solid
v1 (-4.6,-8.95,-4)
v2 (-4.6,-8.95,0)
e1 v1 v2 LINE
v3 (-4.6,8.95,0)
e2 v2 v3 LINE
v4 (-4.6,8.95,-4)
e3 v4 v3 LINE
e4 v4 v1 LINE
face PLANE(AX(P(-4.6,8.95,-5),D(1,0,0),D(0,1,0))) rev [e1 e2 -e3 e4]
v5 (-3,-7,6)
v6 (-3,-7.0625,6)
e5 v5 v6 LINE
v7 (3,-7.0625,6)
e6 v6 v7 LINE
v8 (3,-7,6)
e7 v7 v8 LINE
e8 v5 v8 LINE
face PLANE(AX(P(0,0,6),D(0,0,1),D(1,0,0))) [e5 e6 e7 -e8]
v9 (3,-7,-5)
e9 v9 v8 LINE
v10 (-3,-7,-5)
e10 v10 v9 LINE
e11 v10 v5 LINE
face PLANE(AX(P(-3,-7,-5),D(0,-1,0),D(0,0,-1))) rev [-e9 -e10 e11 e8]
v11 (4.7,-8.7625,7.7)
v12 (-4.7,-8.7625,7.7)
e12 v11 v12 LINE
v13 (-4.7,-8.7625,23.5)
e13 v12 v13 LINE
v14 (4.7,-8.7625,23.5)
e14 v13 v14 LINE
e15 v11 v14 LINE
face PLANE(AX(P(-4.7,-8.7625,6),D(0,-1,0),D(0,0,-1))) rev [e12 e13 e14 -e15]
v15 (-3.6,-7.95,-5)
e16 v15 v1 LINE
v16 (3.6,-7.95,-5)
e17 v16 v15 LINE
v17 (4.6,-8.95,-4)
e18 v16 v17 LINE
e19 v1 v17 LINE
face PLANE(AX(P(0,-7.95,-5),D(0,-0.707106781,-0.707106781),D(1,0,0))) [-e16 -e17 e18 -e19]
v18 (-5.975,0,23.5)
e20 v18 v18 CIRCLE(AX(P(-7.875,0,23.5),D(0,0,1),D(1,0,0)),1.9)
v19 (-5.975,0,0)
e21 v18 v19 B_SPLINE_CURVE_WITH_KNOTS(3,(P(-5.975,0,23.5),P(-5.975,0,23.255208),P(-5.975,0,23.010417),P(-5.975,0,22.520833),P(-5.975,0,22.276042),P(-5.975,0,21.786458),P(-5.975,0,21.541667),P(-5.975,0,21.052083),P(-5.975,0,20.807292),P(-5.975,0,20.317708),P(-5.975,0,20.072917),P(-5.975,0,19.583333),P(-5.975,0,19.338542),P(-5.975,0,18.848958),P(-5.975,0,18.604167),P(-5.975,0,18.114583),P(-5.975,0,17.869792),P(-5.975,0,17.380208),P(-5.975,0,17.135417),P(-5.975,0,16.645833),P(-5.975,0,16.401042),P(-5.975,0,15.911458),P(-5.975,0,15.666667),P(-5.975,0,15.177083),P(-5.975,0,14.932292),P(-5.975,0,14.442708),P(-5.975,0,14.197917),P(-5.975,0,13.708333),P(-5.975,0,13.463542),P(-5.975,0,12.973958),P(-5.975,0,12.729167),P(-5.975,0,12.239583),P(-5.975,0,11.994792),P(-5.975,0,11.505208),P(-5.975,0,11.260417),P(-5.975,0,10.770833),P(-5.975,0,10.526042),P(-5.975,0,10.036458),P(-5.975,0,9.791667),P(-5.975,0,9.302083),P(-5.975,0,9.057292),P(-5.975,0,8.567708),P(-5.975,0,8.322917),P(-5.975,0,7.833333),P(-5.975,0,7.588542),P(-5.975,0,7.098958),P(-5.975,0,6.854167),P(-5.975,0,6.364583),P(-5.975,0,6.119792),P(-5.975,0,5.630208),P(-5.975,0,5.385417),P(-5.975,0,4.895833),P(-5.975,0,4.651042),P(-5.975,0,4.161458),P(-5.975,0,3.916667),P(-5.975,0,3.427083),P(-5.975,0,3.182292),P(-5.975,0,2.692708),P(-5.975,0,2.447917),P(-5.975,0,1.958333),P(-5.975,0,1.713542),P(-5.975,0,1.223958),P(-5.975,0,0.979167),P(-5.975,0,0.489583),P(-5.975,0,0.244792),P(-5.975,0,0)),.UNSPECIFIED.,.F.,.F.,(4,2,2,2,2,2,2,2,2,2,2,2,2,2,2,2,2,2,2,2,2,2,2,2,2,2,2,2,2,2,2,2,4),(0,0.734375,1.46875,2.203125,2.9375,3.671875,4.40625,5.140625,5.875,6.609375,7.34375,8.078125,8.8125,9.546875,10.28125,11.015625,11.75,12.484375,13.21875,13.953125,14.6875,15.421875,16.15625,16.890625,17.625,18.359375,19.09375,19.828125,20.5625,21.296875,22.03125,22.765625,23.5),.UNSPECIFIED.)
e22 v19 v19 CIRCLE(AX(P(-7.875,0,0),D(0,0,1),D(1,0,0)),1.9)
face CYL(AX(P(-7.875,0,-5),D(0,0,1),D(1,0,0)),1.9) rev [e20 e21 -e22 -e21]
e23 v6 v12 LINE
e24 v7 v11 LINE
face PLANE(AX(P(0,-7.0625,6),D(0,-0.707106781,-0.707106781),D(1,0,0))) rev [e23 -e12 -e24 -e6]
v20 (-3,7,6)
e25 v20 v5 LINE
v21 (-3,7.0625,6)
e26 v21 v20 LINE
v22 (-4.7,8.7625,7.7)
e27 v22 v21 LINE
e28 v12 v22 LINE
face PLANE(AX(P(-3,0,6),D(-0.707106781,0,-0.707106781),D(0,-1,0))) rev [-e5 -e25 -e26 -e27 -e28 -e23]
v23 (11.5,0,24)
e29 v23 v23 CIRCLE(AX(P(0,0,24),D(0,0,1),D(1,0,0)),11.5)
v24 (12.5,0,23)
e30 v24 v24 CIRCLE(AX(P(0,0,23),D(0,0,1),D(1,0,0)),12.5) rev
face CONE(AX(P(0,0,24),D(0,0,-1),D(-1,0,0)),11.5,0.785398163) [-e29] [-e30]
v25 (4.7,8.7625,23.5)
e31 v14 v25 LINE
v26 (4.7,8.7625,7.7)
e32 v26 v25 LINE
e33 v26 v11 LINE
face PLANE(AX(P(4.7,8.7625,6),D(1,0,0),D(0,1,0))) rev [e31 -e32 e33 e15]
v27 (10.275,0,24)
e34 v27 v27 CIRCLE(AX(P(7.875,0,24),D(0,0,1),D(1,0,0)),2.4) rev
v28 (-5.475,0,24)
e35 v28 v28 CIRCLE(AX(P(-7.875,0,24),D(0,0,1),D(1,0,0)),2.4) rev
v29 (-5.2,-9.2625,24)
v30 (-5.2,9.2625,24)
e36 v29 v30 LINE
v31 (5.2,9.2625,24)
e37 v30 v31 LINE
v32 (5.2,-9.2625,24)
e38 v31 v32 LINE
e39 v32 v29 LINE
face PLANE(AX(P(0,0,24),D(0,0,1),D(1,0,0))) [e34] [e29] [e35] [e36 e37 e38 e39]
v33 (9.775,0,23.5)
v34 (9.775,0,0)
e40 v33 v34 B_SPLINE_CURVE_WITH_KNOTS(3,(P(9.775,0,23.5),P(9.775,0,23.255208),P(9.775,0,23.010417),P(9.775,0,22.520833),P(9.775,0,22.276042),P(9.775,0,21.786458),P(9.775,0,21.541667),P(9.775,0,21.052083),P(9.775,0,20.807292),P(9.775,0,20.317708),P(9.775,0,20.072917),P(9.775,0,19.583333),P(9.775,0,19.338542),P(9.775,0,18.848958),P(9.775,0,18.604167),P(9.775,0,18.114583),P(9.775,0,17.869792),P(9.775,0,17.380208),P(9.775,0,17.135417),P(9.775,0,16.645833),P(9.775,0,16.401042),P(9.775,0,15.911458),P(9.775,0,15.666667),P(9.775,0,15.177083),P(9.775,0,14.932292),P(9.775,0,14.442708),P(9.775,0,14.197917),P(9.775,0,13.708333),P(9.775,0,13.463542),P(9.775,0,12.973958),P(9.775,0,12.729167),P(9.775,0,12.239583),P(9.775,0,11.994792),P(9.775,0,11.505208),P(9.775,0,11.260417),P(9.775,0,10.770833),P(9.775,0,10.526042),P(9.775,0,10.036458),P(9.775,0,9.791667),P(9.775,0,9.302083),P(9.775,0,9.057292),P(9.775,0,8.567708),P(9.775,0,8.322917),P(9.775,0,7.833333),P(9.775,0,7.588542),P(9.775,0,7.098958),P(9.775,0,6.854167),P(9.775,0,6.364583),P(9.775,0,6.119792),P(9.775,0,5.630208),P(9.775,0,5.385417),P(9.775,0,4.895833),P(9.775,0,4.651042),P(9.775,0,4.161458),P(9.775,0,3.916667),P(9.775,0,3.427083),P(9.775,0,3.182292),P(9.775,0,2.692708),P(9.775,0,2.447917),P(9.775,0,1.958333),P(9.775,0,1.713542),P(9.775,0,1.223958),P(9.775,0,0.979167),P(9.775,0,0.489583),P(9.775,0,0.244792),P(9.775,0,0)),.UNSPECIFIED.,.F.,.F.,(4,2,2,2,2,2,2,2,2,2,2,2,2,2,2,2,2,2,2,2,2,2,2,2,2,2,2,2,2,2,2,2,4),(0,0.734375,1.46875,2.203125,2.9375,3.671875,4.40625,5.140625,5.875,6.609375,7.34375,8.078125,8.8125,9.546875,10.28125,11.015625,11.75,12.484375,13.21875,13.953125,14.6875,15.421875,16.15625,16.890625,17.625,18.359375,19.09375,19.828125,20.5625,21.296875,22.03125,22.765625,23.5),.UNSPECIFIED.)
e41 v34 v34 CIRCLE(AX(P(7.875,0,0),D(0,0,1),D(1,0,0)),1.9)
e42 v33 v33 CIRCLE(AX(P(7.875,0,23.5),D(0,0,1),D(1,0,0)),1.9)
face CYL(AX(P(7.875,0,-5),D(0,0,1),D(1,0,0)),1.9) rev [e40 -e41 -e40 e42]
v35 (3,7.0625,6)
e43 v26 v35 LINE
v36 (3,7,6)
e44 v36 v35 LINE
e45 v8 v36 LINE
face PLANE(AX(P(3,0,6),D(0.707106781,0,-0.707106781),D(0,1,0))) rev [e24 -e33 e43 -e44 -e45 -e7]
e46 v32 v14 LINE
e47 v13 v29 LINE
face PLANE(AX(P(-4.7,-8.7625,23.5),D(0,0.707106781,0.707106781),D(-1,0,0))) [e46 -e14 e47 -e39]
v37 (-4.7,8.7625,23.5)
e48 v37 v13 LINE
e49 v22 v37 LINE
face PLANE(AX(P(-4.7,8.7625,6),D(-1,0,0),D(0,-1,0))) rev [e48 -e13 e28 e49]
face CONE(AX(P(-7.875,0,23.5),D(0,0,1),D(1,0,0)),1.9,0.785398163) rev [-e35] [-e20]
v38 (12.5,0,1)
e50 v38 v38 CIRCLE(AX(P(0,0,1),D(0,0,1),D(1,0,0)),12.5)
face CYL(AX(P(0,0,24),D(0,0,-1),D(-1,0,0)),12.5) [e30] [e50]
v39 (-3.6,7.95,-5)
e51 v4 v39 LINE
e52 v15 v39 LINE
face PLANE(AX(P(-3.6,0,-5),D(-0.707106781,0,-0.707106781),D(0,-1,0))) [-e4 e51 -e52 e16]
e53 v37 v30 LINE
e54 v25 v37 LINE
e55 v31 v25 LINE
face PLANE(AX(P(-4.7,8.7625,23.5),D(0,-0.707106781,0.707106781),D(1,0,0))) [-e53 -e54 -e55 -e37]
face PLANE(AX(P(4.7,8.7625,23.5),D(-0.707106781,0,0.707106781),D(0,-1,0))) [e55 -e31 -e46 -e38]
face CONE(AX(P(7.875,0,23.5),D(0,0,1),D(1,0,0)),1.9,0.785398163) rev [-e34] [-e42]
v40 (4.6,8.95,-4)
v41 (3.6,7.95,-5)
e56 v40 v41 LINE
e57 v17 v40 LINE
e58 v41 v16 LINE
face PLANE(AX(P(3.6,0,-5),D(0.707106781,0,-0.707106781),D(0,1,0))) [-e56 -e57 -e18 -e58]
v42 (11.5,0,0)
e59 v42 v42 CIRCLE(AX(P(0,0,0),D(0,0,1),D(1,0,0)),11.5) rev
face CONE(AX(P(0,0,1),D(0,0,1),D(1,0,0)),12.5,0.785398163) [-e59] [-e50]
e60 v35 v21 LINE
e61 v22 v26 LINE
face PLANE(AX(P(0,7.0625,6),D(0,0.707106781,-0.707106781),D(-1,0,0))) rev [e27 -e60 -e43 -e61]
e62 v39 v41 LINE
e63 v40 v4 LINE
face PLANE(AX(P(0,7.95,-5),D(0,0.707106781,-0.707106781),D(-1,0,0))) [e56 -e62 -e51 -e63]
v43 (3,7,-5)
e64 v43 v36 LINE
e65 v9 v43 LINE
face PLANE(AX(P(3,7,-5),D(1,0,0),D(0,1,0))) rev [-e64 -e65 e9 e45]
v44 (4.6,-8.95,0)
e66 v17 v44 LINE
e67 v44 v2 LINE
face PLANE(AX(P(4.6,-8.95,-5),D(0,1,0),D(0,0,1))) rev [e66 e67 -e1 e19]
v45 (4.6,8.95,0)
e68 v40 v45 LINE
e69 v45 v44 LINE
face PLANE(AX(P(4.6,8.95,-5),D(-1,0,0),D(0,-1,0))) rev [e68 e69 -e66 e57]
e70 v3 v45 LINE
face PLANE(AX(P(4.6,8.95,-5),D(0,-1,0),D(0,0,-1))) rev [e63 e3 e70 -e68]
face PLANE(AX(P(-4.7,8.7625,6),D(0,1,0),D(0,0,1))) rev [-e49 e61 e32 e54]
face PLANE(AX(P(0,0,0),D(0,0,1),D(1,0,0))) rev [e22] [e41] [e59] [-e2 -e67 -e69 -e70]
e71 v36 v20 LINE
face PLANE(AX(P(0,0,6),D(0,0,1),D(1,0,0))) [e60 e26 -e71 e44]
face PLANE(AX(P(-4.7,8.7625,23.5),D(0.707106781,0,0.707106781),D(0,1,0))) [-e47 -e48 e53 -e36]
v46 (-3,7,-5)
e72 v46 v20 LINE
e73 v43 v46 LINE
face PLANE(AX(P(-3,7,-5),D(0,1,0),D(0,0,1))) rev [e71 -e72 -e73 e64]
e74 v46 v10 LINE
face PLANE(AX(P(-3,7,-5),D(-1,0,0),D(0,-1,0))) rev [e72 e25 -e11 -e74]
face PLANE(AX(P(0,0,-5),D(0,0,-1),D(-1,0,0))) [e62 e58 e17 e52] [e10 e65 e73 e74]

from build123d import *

# Parameters (mm, degrees)
CROQUIS1_R              = 12.5
SALIENTE_EXTRUIR1_DEPTH = 24
CROQUIS2_W              = 9.4
CROQUIS2_H              = 17.525
CORTAR_EXTRUIR1_DEPTH   = 18
CROQUIS3_W              = 9.2
CROQUIS3_H              = 17.9
SALIENTE_EXTRUIR2_DEPTH = 5
CHAFL_N1_SIZE           = 1
CHAFL_N2_SIZE           = 1
CROQUIS4_R              = 1.9
CORTAR_EXTRUIR2_DEPTH   = 34.963215395
CHAFL_N3_SIZE           = 1
CROQUIS5_W              = 6
CROQUIS5_H              = 14
CORTAR_EXTRUIR3_DEPTH   = 26.228951623
CHAFL_N4_SIZE           = 1.7
CHAFL_N5_SIZE           = 0.5
CHAFL_N6_SIZE           = 0.5


with BuildPart() as part:
    # Croquis1 → Saliente-Extruir1 (new body)
    with BuildSketch(Plane.XY):
        Circle(CROQUIS1_R)
    extrude(amount=SALIENTE_EXTRUIR1_DEPTH)

    # Croquis2 → Cortar-Extruir1 (cut)
    with BuildSketch(Plane.XY.offset(24)):
        Rectangle(CROQUIS2_W, CROQUIS2_H)
    extrude(amount=-CORTAR_EXTRUIR1_DEPTH, mode=Mode.SUBTRACT)

    # Croquis3 → Saliente-Extruir2 (add)
    with BuildSketch(Plane(origin=(0, 0, 0), x_dir=(-1, 0, 0), z_dir=(0, 0, -1))):
        Rectangle(CROQUIS3_W, CROQUIS3_H)
    extrude(amount=SALIENTE_EXTRUIR2_DEPTH)

    # Chaflán1
    chafl_n1_edges = [part.edges().sort_by_distance(p)[0] for p in [
        (-4.6, 0, -5),
        (0, 8.95, -5),
        (4.6, 0, -5),
        (0, -8.95, -5),
    ]]
    chamfer(chafl_n1_edges, length=CHAFL_N1_SIZE)

    # Chaflán2
    chafl_n2_edges = [part.edges().sort_by_distance(p)[0] for p in [
        (-12.5, 0, 0),
    ]]
    chamfer(chafl_n2_edges, length=CHAFL_N2_SIZE)

    # Croquis4 → Cortar-Extruir2 (cut, through all)
    with BuildSketch(Plane.XY.offset(24)):
        with Locations((-7.875, 0)):
            Circle(CROQUIS4_R)
        with Locations((7.875, 0)):
            Circle(CROQUIS4_R)
    extrude(amount=-CORTAR_EXTRUIR2_DEPTH, mode=Mode.SUBTRACT)

    # Chaflán3
    chafl_n3_edges = [part.edges().sort_by_distance(p)[0] for p in [
        (-12.5, 0, 24),
    ]]
    chamfer(chafl_n3_edges, length=CHAFL_N3_SIZE)

    # Croquis5 → Cortar-Extruir3 (cut, through all)
    with BuildSketch(Plane.XY.offset(6)):
        Rectangle(CROQUIS5_W, CROQUIS5_H)
    extrude(amount=-CORTAR_EXTRUIR3_DEPTH, mode=Mode.SUBTRACT)

    # Chaflán4
    chafl_n4_edges = [part.edges().sort_by_distance(p)[0] for p in [
        (4.7, 0, 6),
        (0, -8.7625, 6),
        (-4.7, 0, 6),
        (0, 8.7625, 6),
    ]]
    chamfer(chafl_n4_edges, length=CHAFL_N4_SIZE - 0.0001)  # a hair under: the kernel refuses the full size

    # Chaflán5
    chafl_n5_edges = [part.edges().sort_by_distance(p)[0] for p in [
        (-9.775, 0, 24),
        (5.975, 0, 24),
    ]]
    chamfer(chafl_n5_edges, length=CHAFL_N5_SIZE)

    # Chaflán6
    chafl_n6_edges = [part.edges().sort_by_distance(p)[0] for p in [
        (0, -8.7625, 24),
        (4.7, 0, 24),
        (0, 8.7625, 24),
        (-4.7, 0, 24),
    ]]
    chamfer(chafl_n6_edges, length=CHAFL_N6_SIZE)


solid = part.part
